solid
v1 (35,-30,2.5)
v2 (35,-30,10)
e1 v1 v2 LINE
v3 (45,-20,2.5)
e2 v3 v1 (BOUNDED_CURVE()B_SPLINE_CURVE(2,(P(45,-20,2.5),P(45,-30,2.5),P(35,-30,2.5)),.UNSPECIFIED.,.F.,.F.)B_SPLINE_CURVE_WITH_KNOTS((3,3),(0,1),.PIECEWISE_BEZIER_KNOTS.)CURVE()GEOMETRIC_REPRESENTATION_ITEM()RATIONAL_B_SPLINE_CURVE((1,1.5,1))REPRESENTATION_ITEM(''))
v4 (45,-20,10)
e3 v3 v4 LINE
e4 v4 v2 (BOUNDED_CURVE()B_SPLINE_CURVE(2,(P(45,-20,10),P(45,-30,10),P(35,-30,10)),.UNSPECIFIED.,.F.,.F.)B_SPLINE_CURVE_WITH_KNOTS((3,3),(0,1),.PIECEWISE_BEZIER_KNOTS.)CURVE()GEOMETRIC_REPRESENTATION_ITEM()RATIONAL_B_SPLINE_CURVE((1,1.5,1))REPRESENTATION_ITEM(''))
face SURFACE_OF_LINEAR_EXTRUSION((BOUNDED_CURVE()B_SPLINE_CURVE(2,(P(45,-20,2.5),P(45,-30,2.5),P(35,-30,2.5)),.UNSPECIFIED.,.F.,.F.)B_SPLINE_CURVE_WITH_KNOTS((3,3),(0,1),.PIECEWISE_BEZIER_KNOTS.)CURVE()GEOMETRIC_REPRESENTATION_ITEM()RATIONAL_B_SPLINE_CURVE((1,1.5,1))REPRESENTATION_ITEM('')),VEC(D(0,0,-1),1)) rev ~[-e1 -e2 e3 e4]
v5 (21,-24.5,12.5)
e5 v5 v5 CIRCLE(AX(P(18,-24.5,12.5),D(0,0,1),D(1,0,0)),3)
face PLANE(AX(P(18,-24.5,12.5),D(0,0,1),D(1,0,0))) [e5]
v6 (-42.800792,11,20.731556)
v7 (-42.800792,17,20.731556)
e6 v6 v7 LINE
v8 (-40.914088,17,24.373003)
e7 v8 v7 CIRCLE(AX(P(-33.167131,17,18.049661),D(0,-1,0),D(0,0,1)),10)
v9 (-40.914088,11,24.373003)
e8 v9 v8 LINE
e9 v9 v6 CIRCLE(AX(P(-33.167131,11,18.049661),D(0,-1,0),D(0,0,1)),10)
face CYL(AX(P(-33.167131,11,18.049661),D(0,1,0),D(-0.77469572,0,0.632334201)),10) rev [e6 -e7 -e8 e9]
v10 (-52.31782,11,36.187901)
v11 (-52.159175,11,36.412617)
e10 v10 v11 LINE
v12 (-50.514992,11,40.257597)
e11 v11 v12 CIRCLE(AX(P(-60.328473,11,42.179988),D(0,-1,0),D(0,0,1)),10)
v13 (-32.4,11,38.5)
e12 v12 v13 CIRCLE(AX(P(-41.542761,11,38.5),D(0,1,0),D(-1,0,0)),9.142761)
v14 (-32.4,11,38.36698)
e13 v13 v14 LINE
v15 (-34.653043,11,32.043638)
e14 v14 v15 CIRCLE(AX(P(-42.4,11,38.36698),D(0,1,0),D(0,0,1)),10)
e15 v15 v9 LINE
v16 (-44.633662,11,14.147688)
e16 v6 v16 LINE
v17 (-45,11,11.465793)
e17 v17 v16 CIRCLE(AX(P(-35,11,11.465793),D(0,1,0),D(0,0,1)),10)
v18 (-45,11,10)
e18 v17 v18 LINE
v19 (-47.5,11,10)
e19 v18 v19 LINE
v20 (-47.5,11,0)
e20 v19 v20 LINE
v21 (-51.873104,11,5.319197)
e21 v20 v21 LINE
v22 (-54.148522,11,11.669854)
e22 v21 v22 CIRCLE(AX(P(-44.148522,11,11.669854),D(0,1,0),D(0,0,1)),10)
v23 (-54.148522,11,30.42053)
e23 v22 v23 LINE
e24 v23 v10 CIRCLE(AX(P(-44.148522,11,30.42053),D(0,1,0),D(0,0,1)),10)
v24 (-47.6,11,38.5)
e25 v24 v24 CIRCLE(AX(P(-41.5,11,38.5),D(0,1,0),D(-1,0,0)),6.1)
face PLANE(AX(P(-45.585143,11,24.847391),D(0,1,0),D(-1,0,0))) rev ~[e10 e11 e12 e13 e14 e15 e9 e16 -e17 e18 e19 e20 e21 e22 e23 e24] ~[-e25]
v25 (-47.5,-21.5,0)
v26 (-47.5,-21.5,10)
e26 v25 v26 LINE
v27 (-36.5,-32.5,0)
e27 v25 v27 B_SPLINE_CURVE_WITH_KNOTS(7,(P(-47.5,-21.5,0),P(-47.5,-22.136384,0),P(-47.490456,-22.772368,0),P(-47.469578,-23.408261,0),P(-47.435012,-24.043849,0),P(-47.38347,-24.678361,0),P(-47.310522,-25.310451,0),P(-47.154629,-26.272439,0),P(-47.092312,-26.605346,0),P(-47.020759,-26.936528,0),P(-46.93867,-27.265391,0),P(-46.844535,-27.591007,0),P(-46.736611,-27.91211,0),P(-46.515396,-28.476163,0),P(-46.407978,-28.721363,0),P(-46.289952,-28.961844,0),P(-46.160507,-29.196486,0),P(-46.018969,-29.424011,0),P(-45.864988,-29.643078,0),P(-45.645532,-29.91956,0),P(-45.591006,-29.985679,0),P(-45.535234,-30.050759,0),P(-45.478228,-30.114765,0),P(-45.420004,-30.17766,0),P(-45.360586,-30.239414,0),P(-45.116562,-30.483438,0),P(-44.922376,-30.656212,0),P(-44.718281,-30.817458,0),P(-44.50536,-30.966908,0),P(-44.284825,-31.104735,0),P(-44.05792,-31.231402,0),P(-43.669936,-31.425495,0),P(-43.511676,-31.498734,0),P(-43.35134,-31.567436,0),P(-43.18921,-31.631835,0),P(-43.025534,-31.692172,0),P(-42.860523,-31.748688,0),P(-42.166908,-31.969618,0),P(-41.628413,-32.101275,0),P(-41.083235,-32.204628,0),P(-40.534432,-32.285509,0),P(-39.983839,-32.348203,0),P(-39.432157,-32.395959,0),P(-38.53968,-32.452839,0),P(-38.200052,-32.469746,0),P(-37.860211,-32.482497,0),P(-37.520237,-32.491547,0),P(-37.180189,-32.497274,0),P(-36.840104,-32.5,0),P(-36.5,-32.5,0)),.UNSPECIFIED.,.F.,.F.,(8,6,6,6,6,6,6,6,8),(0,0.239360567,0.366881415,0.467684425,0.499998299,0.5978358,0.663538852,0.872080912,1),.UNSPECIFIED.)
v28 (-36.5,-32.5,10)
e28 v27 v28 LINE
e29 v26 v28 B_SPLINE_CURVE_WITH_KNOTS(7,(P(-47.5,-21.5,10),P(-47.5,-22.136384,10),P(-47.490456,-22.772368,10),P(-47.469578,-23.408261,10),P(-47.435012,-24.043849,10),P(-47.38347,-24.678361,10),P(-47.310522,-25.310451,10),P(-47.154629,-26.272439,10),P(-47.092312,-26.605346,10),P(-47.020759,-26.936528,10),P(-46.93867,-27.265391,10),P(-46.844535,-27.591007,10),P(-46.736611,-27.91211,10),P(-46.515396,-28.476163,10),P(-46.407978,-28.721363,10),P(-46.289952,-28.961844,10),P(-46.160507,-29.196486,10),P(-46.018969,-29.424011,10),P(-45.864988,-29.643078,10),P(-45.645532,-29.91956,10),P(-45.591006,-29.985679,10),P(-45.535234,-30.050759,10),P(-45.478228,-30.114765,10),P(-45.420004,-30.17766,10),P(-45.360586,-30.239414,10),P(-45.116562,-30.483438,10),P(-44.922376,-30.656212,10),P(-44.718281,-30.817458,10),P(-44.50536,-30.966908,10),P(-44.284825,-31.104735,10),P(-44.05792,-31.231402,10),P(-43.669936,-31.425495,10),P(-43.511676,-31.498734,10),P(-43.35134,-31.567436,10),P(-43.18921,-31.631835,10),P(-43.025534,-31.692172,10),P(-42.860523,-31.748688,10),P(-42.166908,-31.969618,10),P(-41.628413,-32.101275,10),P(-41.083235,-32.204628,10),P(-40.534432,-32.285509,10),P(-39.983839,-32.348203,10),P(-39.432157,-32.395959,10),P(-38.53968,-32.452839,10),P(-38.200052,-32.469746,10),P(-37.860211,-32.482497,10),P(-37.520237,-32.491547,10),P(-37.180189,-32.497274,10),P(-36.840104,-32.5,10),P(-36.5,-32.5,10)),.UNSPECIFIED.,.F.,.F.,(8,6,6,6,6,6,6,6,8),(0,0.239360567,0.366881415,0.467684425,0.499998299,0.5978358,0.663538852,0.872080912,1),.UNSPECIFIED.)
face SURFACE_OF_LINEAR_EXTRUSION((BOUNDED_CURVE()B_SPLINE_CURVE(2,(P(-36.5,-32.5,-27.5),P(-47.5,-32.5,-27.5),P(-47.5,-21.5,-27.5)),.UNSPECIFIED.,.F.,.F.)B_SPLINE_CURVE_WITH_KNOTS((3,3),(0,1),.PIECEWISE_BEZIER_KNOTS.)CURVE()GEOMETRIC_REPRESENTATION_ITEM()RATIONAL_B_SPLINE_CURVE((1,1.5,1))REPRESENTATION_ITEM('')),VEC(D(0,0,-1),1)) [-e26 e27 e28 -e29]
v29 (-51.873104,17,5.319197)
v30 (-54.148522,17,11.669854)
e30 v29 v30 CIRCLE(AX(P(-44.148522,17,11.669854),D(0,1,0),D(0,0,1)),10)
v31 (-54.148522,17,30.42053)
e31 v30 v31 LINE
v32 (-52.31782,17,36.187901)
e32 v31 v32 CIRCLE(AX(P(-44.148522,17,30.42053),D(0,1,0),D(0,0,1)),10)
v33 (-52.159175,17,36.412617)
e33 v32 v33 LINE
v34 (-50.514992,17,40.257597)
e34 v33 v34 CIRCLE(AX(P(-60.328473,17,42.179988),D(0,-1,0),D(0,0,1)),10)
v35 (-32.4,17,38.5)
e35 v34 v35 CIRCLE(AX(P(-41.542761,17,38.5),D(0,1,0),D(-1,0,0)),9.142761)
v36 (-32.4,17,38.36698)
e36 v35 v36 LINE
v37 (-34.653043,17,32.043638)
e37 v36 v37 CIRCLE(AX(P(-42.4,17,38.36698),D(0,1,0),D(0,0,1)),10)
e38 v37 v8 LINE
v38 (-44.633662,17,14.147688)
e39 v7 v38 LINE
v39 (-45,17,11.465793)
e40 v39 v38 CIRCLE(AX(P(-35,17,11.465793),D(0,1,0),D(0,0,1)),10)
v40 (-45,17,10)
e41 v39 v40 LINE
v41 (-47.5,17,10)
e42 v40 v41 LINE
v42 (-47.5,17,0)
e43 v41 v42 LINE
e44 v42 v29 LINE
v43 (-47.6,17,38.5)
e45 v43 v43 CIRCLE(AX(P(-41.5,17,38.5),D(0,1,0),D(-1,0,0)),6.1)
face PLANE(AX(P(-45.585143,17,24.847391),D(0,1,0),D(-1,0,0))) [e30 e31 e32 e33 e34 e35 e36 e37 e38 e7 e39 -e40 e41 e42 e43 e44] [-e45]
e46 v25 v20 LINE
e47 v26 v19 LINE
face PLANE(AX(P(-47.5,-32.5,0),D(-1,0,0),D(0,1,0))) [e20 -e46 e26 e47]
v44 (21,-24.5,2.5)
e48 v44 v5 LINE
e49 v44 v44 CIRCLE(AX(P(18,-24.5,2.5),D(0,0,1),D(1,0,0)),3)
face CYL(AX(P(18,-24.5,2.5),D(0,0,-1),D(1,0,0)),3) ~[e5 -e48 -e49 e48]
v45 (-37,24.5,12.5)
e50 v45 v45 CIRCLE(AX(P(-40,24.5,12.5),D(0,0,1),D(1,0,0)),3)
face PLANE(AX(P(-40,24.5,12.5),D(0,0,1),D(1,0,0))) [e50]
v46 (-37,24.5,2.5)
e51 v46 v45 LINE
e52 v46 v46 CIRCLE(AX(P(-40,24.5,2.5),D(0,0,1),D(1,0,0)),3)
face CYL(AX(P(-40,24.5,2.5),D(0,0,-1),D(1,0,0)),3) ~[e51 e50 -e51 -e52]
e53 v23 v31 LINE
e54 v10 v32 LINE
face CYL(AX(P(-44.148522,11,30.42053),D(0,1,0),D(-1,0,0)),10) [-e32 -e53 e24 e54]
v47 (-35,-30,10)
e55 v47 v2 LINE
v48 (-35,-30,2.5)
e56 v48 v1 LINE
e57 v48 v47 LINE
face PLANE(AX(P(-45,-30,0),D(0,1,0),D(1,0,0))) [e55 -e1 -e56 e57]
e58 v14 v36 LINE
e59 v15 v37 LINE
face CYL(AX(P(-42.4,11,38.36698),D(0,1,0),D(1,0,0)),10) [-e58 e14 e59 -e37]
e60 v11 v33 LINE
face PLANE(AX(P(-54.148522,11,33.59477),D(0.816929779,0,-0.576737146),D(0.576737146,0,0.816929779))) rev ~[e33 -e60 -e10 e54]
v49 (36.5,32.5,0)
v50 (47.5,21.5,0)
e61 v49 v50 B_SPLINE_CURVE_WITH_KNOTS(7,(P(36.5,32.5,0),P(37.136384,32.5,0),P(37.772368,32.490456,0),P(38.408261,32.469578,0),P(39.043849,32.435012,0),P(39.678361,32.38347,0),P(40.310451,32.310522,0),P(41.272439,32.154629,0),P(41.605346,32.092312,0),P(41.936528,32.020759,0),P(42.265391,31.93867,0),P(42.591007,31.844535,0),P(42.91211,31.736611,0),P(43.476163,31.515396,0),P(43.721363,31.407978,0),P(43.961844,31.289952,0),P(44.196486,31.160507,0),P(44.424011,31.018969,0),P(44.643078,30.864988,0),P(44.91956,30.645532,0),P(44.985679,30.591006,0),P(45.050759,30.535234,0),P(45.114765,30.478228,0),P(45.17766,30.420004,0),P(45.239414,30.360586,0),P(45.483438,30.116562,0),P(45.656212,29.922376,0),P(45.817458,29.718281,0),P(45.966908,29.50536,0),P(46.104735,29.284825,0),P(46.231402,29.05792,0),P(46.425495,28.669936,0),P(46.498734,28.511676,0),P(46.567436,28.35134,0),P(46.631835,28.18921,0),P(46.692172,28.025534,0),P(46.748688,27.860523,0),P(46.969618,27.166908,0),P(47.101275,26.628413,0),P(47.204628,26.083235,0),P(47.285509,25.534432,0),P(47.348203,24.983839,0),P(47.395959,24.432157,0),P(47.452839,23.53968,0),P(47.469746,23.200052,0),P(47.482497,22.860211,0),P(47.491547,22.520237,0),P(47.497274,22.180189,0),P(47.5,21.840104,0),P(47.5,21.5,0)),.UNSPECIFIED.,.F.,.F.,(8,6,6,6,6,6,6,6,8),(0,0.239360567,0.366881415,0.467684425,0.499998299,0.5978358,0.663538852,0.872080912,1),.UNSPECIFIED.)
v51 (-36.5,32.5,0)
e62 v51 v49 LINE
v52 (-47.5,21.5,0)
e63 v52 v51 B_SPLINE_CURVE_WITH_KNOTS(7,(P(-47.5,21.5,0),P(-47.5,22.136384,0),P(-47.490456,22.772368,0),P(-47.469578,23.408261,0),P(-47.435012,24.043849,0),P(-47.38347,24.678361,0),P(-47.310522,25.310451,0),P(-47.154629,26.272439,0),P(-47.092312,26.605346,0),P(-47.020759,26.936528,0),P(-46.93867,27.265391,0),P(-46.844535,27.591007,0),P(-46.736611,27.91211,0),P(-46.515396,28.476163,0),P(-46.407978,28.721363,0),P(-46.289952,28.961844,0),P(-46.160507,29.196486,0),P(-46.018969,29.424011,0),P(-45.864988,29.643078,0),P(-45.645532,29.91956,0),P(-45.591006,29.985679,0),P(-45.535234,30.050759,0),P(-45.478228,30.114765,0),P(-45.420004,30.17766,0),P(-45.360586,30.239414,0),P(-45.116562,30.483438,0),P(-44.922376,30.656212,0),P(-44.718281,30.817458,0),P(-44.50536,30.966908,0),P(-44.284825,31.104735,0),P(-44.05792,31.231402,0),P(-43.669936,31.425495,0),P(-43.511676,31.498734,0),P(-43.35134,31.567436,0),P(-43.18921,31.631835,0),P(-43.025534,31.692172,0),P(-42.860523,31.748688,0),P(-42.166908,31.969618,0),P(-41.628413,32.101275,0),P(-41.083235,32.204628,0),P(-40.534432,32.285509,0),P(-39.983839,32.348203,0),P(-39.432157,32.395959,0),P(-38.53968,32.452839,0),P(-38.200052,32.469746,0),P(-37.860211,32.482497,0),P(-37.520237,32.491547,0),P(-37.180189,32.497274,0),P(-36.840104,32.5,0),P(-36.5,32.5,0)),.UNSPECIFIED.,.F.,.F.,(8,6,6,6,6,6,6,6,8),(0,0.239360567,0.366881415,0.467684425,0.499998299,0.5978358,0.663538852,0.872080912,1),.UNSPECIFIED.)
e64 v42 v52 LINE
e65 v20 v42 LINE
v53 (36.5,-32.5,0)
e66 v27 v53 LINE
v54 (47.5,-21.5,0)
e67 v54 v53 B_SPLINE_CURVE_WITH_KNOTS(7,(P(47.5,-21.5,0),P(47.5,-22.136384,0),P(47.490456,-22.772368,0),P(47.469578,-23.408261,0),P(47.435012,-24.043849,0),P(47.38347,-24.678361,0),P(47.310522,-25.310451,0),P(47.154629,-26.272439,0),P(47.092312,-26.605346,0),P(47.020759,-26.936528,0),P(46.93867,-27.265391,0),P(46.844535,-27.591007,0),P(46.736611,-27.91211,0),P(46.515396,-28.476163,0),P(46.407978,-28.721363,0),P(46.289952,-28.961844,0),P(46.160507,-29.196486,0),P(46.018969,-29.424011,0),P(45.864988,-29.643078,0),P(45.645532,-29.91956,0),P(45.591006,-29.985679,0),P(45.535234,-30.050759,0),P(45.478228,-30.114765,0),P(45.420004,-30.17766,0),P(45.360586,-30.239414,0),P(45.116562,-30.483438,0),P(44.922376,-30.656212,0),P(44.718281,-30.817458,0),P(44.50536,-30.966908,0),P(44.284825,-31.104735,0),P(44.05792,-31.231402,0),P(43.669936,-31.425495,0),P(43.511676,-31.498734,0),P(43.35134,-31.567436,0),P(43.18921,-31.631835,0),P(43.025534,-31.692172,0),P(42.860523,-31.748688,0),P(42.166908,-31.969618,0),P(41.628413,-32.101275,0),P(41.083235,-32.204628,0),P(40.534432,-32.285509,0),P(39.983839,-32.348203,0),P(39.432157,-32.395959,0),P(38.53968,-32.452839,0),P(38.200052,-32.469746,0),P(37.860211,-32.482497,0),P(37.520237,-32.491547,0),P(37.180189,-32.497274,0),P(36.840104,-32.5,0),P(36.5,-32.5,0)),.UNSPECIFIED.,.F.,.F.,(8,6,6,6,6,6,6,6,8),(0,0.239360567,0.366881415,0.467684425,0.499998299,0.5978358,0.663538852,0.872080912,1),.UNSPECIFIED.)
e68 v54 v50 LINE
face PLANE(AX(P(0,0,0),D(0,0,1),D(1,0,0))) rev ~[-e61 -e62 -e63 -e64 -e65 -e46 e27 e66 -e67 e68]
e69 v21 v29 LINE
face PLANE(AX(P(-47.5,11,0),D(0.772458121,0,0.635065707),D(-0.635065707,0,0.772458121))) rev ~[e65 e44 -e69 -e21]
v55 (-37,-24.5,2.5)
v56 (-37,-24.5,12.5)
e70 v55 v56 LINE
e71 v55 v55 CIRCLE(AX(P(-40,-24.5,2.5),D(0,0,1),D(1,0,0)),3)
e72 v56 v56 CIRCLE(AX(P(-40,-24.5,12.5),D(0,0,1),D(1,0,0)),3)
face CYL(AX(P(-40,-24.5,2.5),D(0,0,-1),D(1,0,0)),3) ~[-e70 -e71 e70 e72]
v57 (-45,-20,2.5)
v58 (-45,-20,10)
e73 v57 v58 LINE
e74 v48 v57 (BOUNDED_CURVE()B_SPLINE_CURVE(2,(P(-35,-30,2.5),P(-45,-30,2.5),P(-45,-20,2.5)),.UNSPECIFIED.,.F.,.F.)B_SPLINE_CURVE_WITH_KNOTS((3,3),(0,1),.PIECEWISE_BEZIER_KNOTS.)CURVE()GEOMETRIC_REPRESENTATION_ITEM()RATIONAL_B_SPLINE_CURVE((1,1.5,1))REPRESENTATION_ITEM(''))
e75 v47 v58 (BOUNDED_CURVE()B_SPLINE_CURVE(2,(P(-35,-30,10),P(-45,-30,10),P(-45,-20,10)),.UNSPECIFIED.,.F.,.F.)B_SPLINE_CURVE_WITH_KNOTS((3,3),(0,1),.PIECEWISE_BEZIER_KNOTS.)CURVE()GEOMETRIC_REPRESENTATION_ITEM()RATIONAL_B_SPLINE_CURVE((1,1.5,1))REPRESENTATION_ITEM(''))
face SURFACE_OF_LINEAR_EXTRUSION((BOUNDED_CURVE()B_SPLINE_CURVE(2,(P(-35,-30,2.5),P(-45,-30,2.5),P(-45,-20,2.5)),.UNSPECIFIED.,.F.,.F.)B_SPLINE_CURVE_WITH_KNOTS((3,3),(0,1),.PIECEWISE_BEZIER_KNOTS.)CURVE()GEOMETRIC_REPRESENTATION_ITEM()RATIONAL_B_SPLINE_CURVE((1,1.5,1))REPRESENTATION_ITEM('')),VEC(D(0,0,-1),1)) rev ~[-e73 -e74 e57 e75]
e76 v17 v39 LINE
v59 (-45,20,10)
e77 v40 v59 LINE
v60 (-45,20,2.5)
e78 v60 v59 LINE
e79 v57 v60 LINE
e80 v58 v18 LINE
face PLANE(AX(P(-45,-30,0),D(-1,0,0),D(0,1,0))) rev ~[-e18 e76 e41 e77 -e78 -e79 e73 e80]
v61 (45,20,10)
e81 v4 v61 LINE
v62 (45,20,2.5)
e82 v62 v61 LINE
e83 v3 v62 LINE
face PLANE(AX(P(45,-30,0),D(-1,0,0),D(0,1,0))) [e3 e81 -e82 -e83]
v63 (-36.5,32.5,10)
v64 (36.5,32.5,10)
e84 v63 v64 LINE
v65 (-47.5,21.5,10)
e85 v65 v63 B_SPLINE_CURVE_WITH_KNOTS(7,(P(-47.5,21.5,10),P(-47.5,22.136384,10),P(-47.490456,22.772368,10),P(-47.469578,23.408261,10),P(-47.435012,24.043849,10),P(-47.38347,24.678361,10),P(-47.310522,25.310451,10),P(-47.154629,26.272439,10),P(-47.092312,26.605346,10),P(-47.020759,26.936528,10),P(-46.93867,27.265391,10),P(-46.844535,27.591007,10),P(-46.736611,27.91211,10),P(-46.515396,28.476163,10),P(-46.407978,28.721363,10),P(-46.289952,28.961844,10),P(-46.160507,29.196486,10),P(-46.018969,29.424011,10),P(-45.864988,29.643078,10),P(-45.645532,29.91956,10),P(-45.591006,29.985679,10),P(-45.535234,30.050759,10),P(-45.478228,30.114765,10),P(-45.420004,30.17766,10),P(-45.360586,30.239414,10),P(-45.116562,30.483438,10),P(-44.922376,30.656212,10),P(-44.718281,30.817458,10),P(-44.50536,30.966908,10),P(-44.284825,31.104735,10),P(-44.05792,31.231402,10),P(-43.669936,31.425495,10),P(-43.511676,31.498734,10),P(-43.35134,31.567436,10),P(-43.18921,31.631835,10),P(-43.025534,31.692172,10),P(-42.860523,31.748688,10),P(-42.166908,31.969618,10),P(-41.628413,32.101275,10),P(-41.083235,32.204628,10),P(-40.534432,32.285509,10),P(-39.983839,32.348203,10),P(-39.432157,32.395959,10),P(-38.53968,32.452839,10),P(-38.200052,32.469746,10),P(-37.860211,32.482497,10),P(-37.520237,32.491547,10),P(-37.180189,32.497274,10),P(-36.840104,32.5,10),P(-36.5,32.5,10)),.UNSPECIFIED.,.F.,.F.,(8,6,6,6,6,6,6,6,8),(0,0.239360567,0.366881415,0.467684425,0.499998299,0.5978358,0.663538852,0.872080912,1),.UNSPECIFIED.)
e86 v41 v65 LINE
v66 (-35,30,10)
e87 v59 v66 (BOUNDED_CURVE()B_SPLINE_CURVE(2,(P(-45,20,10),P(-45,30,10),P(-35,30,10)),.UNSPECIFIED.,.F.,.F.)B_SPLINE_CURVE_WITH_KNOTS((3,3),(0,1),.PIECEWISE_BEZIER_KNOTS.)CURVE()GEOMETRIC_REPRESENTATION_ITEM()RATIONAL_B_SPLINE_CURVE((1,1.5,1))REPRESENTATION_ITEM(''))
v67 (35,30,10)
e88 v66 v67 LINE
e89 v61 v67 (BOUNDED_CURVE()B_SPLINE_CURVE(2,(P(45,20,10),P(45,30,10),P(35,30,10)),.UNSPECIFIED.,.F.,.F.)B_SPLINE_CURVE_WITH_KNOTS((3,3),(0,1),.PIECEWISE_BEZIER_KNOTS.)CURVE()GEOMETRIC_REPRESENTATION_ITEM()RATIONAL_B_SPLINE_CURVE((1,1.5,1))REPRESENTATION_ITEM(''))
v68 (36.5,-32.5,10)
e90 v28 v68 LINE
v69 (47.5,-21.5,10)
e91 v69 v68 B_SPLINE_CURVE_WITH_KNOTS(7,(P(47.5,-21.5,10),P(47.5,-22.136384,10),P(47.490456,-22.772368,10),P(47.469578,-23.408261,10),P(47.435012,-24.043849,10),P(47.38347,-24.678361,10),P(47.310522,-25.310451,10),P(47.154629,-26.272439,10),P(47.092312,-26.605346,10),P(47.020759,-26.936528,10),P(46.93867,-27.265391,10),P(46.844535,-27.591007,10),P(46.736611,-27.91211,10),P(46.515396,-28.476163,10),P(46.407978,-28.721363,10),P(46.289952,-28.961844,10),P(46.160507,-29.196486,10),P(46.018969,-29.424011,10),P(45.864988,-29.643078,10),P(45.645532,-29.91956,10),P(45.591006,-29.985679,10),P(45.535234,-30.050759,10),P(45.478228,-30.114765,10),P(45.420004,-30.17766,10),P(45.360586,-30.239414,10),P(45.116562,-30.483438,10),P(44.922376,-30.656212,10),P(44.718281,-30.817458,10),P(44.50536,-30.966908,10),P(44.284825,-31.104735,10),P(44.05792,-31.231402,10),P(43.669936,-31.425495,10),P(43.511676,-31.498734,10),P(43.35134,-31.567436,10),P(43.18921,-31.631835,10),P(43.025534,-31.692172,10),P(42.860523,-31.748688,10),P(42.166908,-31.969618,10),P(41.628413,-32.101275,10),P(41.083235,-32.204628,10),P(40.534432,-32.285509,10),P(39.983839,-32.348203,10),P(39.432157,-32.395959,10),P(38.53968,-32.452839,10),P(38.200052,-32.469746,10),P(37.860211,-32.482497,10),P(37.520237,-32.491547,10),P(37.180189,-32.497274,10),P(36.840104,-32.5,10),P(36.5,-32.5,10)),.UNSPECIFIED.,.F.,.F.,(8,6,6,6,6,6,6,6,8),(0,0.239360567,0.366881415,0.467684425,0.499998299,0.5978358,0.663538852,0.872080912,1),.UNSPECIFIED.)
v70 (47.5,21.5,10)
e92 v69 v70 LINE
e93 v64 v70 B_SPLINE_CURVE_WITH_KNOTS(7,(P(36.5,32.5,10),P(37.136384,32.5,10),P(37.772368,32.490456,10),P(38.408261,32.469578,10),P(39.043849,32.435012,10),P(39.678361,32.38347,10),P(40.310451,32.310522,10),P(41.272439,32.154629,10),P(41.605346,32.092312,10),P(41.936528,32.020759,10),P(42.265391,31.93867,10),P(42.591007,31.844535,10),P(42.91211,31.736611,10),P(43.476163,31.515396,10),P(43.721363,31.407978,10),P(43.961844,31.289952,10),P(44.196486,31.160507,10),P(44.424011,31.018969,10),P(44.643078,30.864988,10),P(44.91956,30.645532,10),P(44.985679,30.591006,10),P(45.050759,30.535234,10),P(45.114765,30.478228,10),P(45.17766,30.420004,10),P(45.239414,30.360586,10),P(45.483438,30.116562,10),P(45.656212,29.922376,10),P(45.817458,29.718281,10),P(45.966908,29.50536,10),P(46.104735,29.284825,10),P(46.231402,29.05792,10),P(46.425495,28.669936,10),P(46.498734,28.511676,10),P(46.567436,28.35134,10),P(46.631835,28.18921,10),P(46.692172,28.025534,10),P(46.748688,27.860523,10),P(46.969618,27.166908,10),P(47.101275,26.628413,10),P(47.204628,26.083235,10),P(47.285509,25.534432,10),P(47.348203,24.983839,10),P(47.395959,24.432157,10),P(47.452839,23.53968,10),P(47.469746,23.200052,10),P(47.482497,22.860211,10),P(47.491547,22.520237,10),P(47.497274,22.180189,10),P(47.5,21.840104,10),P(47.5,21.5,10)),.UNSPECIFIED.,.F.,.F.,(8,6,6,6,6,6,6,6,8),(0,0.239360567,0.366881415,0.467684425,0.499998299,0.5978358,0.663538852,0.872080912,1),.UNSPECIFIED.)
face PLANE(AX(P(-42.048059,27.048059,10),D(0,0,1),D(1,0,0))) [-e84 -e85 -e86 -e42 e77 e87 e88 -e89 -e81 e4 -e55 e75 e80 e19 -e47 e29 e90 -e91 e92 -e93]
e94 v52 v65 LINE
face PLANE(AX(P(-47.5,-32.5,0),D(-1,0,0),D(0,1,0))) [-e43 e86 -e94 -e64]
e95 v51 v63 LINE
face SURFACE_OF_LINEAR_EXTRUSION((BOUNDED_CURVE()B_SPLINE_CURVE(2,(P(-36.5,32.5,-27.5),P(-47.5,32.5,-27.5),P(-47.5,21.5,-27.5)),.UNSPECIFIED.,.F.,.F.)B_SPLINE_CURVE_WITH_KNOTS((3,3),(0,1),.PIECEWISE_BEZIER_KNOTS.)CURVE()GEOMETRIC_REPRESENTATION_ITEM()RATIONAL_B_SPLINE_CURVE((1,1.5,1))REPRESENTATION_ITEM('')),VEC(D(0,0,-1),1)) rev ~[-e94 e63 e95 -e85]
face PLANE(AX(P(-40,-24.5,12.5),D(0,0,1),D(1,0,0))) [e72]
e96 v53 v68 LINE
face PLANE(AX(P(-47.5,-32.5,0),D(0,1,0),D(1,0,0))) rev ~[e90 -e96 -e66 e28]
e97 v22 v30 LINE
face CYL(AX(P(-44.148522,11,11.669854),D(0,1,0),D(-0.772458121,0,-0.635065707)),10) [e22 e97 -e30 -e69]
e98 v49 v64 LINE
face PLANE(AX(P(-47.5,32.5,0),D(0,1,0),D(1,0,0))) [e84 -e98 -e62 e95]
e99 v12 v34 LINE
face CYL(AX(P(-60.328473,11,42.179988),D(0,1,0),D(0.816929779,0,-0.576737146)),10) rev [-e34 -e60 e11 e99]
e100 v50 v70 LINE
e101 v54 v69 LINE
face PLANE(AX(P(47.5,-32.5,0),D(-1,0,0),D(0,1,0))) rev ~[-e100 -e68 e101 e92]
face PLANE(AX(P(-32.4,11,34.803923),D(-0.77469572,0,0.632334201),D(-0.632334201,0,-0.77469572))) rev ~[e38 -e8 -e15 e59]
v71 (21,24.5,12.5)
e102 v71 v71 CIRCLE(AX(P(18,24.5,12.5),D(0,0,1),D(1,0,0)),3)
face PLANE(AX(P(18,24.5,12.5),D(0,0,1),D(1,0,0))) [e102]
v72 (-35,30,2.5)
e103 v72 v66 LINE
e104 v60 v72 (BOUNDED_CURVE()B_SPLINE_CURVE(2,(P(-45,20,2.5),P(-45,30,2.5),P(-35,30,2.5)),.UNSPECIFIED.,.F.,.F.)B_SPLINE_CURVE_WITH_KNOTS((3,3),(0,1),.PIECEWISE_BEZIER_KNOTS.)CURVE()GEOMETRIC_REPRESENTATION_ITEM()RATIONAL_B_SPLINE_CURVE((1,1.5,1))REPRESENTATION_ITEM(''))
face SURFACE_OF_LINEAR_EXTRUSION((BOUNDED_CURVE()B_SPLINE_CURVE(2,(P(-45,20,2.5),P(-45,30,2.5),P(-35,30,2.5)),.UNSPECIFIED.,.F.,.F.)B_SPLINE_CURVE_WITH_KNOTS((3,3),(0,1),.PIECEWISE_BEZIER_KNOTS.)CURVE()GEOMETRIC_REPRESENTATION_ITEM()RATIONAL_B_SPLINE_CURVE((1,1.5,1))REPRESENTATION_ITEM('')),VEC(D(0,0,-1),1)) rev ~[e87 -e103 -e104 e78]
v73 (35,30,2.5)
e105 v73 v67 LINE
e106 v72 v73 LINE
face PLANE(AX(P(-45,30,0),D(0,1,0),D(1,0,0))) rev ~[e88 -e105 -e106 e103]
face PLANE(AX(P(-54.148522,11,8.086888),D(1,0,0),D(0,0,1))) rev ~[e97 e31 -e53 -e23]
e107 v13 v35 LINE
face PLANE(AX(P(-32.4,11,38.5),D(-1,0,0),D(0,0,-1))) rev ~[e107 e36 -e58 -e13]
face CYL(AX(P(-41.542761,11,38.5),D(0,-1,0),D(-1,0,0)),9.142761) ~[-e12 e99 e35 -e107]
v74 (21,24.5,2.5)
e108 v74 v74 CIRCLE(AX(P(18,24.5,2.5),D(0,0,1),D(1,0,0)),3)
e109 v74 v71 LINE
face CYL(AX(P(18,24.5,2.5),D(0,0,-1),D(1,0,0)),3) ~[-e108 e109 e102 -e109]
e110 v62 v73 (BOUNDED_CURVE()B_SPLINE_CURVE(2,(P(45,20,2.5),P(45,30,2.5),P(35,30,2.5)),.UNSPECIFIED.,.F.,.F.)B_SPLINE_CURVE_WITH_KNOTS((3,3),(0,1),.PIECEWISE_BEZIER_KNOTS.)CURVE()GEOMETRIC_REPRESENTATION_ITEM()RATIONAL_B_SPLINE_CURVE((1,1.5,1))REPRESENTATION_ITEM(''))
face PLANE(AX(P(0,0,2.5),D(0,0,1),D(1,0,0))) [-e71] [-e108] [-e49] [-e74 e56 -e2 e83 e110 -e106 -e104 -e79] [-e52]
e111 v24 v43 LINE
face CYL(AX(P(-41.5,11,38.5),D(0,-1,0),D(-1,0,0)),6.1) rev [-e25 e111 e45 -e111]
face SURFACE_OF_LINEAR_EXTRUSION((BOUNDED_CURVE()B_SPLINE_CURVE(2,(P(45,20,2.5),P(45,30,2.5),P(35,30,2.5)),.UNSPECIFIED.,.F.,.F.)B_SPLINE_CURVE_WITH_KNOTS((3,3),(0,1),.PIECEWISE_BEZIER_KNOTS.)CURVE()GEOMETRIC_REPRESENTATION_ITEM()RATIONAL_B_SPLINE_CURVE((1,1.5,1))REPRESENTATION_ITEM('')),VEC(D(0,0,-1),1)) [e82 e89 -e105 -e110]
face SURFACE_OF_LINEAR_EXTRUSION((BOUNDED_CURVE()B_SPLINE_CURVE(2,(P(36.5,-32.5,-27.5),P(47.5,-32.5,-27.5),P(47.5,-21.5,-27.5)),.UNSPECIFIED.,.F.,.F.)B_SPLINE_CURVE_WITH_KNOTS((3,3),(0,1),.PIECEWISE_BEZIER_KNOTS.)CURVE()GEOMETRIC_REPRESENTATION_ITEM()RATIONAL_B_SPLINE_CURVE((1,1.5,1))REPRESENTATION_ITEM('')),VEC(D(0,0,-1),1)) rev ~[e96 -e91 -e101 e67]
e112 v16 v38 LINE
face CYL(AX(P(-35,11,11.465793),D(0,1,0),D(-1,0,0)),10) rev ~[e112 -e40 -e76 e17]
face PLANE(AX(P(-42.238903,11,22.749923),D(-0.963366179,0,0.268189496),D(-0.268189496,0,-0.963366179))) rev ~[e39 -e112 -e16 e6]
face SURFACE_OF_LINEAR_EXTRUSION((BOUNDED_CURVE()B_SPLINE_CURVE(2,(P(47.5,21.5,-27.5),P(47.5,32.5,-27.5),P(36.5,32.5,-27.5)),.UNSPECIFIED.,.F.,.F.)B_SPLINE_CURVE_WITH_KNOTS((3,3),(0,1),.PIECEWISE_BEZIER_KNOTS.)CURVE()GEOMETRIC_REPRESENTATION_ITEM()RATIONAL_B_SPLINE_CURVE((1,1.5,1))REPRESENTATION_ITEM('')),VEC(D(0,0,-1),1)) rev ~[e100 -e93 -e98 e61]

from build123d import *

# Parameters (mm, degrees)
F0_W        = 90
F0_H        = 60
F1_DEPTH    = 2.5
F2_W        = 95
F2_H        = 65
F2_W_2      = 90
F2_H_2      = 60
F3_DEPTH    = 10
F4_T1_DEPTH = 7.5
F5_T1_DEPTH = 65
F6_R        = 3
F7_DEPTH    = 10
F10_R       = 6.1
F11_DEPTH   = 6
F12_R       = 10


# Not quite as in the source:
# - a fillet or chamfer that OpenCascade refuses, or shapes differently, is made with other operations: its cross-section is extruded or revolved along the edge and cut away or added


with BuildPart() as f1:
    # F0 (on Top) → F1 (new body)
    with BuildSketch(Plane.XY):
        Rectangle(F0_W, F0_H)
    extrude(amount=F1_DEPTH)

    # F2 (on Top) → F3 (join)
    with BuildSketch(Plane.XY):
        Rectangle(F2_W, F2_H)
        Rectangle(F2_W_2, F2_H_2, mode=Mode.SUBTRACT)
    extrude(amount=F3_DEPTH)

    # F4: fillet of radius 10 on 4 edges, made by hand

    # F4_s2 → F4_t1 (join)
    with BuildSketch(Plane.XY.offset(2.5)):
        with BuildLine():
            add(Edge.make_bspline(
                [(-45, 20), (-45, 30), (-35, 30)],
                knots=[0, 0, 0, 1, 1, 1], degree=2, weights=[1, 1.5, 1]))
            Line((-35, 30), (-45, 30))
            Line((-45, 30), (-45, 20))
        make_face()
        with BuildLine():
            add(Edge.make_bspline(
                [(45, 20), (45, 30), (35, 30)],
                knots=[0, 0, 0, 1, 1, 1], degree=2, weights=[1, 1.5, 1]))
            Line((35, 30), (45, 30))
            Line((45, 30), (45, 20))
        make_face()
        with BuildLine():
            add(Edge.make_bspline(
                [(45, -20), (45, -30), (35, -30)],
                knots=[0, 0, 0, 1, 1, 1], degree=2, weights=[1, 1.5, 1]))
            Line((35, -30), (45, -30))
            Line((45, -30), (45, -20))
        make_face()
        with BuildLine():
            add(Edge.make_bspline(
                [(-35, -30), (-45, -30), (-45, -20)],
                knots=[0, 0, 0, 1, 1, 1], degree=2, weights=[1, 1.5, 1]))
            Line((-45, -20), (-45, -30))
            Line((-45, -30), (-35, -30))
        make_face()
    extrude(amount=F4_T1_DEPTH)

    # F5: fillet of radius 11 on 4 edges, made by hand

    # F5_s2 → F5_t1 (cut)
    with BuildSketch(Plane.XY.offset(-27.5)):
        with BuildLine():
            add(Edge.make_bspline(
                [(-36.5, 32.5), (-47.5, 32.5), (-47.5, 21.5)],
                knots=[0, 0, 0, 1, 1, 1], degree=2, weights=[1, 1.5, 1]))
            Line((-47.5, 21.5), (-47.5, 32.5))
            Line((-47.5, 32.5), (-36.5, 32.5))
        make_face()
        with BuildLine():
            add(Edge.make_bspline(
                [(-36.5, -32.5), (-47.5, -32.5), (-47.5, -21.5)],
                knots=[0, 0, 0, 1, 1, 1], degree=2, weights=[1, 1.5, 1]))
            Line((-47.5, -21.5), (-47.5, -32.5))
            Line((-47.5, -32.5), (-36.5, -32.5))
        make_face()
        with BuildLine():
            add(Edge.make_bspline(
                [(47.5, 21.5), (47.5, 32.5), (36.5, 32.5)],
                knots=[0, 0, 0, 1, 1, 1], degree=2, weights=[1, 1.5, 1]))
            Line((36.5, 32.5), (47.5, 32.5))
            Line((47.5, 32.5), (47.5, 21.5))
        make_face()
        with BuildLine():
            add(Edge.make_bspline(
                [(36.5, -32.5), (47.5, -32.5), (47.5, -21.5)],
                knots=[0, 0, 0, 1, 1, 1], degree=2, weights=[1, 1.5, 1]))
            Line((47.5, -21.5), (47.5, -32.5))
            Line((47.5, -32.5), (36.5, -32.5))
        make_face()
    extrude(amount=F5_T1_DEPTH, mode=Mode.SUBTRACT)

    # F6 (on face) → F7 (join)
    with BuildSketch(Plane.XY.offset(2.5)):
        with Locations((-40, 24.5)):
            Circle(F6_R)
        with Locations((-40, -24.5)):
            Circle(F6_R)
        with Locations((18, -24.5)):
            Circle(F6_R)
        with Locations((18, 24.5)):
            Circle(F6_R)
    extrude(amount=F7_DEPTH)

    # F10 (on offset) → F11 (join)
    with BuildSketch(Plane(origin=(0, 11, 0), x_dir=(-1, 0, 0), z_dir=(0, 1, 0))):
        with BuildLine():
            Line((45, 0), (47.5, 0))
            Line((47.5, 0), (54.148522424, 8.0868878322))
            Line((54.148522424, 8.0868878322), (54.148522424, 33.5947699827))
            Line((54.148522424, 33.5947699827), (50.6855217688, 38.5))
            ThreePointArc((50.6855217688, 38.5), (41.5427608844, 47.6427608844), (32.4, 38.5))
            Line((32.4, 38.5), (32.4, 34.8039232194))
            Line((32.4, 34.8039232194), (42.2389033973, 22.7499233782))
            Line((42.2389033973, 22.7499233782), (45, 12.8317605704))
            Line((45, 12.8317605704), (45, 0))
        make_face()
        with Locations((41.5, 38.5)):
            Circle(F10_R, mode=Mode.SUBTRACT)
    extrude(amount=F11_DEPTH)

    # F12
    f12_edges = [f1.edges().sort_by_distance(p)[0] for p in [
        (-32.4, 14, 34.803923),
        (-42.238903, 14, 22.749923),
        (-45, 14, 12.831761),
        (-50.685522, 14, 38.5),
        (-54.148522, 14, 33.59477),
        (-54.148522, 14, 8.086888),
    ]]
    fillet(f12_edges, radius=F12_R)


solid = f1.part
